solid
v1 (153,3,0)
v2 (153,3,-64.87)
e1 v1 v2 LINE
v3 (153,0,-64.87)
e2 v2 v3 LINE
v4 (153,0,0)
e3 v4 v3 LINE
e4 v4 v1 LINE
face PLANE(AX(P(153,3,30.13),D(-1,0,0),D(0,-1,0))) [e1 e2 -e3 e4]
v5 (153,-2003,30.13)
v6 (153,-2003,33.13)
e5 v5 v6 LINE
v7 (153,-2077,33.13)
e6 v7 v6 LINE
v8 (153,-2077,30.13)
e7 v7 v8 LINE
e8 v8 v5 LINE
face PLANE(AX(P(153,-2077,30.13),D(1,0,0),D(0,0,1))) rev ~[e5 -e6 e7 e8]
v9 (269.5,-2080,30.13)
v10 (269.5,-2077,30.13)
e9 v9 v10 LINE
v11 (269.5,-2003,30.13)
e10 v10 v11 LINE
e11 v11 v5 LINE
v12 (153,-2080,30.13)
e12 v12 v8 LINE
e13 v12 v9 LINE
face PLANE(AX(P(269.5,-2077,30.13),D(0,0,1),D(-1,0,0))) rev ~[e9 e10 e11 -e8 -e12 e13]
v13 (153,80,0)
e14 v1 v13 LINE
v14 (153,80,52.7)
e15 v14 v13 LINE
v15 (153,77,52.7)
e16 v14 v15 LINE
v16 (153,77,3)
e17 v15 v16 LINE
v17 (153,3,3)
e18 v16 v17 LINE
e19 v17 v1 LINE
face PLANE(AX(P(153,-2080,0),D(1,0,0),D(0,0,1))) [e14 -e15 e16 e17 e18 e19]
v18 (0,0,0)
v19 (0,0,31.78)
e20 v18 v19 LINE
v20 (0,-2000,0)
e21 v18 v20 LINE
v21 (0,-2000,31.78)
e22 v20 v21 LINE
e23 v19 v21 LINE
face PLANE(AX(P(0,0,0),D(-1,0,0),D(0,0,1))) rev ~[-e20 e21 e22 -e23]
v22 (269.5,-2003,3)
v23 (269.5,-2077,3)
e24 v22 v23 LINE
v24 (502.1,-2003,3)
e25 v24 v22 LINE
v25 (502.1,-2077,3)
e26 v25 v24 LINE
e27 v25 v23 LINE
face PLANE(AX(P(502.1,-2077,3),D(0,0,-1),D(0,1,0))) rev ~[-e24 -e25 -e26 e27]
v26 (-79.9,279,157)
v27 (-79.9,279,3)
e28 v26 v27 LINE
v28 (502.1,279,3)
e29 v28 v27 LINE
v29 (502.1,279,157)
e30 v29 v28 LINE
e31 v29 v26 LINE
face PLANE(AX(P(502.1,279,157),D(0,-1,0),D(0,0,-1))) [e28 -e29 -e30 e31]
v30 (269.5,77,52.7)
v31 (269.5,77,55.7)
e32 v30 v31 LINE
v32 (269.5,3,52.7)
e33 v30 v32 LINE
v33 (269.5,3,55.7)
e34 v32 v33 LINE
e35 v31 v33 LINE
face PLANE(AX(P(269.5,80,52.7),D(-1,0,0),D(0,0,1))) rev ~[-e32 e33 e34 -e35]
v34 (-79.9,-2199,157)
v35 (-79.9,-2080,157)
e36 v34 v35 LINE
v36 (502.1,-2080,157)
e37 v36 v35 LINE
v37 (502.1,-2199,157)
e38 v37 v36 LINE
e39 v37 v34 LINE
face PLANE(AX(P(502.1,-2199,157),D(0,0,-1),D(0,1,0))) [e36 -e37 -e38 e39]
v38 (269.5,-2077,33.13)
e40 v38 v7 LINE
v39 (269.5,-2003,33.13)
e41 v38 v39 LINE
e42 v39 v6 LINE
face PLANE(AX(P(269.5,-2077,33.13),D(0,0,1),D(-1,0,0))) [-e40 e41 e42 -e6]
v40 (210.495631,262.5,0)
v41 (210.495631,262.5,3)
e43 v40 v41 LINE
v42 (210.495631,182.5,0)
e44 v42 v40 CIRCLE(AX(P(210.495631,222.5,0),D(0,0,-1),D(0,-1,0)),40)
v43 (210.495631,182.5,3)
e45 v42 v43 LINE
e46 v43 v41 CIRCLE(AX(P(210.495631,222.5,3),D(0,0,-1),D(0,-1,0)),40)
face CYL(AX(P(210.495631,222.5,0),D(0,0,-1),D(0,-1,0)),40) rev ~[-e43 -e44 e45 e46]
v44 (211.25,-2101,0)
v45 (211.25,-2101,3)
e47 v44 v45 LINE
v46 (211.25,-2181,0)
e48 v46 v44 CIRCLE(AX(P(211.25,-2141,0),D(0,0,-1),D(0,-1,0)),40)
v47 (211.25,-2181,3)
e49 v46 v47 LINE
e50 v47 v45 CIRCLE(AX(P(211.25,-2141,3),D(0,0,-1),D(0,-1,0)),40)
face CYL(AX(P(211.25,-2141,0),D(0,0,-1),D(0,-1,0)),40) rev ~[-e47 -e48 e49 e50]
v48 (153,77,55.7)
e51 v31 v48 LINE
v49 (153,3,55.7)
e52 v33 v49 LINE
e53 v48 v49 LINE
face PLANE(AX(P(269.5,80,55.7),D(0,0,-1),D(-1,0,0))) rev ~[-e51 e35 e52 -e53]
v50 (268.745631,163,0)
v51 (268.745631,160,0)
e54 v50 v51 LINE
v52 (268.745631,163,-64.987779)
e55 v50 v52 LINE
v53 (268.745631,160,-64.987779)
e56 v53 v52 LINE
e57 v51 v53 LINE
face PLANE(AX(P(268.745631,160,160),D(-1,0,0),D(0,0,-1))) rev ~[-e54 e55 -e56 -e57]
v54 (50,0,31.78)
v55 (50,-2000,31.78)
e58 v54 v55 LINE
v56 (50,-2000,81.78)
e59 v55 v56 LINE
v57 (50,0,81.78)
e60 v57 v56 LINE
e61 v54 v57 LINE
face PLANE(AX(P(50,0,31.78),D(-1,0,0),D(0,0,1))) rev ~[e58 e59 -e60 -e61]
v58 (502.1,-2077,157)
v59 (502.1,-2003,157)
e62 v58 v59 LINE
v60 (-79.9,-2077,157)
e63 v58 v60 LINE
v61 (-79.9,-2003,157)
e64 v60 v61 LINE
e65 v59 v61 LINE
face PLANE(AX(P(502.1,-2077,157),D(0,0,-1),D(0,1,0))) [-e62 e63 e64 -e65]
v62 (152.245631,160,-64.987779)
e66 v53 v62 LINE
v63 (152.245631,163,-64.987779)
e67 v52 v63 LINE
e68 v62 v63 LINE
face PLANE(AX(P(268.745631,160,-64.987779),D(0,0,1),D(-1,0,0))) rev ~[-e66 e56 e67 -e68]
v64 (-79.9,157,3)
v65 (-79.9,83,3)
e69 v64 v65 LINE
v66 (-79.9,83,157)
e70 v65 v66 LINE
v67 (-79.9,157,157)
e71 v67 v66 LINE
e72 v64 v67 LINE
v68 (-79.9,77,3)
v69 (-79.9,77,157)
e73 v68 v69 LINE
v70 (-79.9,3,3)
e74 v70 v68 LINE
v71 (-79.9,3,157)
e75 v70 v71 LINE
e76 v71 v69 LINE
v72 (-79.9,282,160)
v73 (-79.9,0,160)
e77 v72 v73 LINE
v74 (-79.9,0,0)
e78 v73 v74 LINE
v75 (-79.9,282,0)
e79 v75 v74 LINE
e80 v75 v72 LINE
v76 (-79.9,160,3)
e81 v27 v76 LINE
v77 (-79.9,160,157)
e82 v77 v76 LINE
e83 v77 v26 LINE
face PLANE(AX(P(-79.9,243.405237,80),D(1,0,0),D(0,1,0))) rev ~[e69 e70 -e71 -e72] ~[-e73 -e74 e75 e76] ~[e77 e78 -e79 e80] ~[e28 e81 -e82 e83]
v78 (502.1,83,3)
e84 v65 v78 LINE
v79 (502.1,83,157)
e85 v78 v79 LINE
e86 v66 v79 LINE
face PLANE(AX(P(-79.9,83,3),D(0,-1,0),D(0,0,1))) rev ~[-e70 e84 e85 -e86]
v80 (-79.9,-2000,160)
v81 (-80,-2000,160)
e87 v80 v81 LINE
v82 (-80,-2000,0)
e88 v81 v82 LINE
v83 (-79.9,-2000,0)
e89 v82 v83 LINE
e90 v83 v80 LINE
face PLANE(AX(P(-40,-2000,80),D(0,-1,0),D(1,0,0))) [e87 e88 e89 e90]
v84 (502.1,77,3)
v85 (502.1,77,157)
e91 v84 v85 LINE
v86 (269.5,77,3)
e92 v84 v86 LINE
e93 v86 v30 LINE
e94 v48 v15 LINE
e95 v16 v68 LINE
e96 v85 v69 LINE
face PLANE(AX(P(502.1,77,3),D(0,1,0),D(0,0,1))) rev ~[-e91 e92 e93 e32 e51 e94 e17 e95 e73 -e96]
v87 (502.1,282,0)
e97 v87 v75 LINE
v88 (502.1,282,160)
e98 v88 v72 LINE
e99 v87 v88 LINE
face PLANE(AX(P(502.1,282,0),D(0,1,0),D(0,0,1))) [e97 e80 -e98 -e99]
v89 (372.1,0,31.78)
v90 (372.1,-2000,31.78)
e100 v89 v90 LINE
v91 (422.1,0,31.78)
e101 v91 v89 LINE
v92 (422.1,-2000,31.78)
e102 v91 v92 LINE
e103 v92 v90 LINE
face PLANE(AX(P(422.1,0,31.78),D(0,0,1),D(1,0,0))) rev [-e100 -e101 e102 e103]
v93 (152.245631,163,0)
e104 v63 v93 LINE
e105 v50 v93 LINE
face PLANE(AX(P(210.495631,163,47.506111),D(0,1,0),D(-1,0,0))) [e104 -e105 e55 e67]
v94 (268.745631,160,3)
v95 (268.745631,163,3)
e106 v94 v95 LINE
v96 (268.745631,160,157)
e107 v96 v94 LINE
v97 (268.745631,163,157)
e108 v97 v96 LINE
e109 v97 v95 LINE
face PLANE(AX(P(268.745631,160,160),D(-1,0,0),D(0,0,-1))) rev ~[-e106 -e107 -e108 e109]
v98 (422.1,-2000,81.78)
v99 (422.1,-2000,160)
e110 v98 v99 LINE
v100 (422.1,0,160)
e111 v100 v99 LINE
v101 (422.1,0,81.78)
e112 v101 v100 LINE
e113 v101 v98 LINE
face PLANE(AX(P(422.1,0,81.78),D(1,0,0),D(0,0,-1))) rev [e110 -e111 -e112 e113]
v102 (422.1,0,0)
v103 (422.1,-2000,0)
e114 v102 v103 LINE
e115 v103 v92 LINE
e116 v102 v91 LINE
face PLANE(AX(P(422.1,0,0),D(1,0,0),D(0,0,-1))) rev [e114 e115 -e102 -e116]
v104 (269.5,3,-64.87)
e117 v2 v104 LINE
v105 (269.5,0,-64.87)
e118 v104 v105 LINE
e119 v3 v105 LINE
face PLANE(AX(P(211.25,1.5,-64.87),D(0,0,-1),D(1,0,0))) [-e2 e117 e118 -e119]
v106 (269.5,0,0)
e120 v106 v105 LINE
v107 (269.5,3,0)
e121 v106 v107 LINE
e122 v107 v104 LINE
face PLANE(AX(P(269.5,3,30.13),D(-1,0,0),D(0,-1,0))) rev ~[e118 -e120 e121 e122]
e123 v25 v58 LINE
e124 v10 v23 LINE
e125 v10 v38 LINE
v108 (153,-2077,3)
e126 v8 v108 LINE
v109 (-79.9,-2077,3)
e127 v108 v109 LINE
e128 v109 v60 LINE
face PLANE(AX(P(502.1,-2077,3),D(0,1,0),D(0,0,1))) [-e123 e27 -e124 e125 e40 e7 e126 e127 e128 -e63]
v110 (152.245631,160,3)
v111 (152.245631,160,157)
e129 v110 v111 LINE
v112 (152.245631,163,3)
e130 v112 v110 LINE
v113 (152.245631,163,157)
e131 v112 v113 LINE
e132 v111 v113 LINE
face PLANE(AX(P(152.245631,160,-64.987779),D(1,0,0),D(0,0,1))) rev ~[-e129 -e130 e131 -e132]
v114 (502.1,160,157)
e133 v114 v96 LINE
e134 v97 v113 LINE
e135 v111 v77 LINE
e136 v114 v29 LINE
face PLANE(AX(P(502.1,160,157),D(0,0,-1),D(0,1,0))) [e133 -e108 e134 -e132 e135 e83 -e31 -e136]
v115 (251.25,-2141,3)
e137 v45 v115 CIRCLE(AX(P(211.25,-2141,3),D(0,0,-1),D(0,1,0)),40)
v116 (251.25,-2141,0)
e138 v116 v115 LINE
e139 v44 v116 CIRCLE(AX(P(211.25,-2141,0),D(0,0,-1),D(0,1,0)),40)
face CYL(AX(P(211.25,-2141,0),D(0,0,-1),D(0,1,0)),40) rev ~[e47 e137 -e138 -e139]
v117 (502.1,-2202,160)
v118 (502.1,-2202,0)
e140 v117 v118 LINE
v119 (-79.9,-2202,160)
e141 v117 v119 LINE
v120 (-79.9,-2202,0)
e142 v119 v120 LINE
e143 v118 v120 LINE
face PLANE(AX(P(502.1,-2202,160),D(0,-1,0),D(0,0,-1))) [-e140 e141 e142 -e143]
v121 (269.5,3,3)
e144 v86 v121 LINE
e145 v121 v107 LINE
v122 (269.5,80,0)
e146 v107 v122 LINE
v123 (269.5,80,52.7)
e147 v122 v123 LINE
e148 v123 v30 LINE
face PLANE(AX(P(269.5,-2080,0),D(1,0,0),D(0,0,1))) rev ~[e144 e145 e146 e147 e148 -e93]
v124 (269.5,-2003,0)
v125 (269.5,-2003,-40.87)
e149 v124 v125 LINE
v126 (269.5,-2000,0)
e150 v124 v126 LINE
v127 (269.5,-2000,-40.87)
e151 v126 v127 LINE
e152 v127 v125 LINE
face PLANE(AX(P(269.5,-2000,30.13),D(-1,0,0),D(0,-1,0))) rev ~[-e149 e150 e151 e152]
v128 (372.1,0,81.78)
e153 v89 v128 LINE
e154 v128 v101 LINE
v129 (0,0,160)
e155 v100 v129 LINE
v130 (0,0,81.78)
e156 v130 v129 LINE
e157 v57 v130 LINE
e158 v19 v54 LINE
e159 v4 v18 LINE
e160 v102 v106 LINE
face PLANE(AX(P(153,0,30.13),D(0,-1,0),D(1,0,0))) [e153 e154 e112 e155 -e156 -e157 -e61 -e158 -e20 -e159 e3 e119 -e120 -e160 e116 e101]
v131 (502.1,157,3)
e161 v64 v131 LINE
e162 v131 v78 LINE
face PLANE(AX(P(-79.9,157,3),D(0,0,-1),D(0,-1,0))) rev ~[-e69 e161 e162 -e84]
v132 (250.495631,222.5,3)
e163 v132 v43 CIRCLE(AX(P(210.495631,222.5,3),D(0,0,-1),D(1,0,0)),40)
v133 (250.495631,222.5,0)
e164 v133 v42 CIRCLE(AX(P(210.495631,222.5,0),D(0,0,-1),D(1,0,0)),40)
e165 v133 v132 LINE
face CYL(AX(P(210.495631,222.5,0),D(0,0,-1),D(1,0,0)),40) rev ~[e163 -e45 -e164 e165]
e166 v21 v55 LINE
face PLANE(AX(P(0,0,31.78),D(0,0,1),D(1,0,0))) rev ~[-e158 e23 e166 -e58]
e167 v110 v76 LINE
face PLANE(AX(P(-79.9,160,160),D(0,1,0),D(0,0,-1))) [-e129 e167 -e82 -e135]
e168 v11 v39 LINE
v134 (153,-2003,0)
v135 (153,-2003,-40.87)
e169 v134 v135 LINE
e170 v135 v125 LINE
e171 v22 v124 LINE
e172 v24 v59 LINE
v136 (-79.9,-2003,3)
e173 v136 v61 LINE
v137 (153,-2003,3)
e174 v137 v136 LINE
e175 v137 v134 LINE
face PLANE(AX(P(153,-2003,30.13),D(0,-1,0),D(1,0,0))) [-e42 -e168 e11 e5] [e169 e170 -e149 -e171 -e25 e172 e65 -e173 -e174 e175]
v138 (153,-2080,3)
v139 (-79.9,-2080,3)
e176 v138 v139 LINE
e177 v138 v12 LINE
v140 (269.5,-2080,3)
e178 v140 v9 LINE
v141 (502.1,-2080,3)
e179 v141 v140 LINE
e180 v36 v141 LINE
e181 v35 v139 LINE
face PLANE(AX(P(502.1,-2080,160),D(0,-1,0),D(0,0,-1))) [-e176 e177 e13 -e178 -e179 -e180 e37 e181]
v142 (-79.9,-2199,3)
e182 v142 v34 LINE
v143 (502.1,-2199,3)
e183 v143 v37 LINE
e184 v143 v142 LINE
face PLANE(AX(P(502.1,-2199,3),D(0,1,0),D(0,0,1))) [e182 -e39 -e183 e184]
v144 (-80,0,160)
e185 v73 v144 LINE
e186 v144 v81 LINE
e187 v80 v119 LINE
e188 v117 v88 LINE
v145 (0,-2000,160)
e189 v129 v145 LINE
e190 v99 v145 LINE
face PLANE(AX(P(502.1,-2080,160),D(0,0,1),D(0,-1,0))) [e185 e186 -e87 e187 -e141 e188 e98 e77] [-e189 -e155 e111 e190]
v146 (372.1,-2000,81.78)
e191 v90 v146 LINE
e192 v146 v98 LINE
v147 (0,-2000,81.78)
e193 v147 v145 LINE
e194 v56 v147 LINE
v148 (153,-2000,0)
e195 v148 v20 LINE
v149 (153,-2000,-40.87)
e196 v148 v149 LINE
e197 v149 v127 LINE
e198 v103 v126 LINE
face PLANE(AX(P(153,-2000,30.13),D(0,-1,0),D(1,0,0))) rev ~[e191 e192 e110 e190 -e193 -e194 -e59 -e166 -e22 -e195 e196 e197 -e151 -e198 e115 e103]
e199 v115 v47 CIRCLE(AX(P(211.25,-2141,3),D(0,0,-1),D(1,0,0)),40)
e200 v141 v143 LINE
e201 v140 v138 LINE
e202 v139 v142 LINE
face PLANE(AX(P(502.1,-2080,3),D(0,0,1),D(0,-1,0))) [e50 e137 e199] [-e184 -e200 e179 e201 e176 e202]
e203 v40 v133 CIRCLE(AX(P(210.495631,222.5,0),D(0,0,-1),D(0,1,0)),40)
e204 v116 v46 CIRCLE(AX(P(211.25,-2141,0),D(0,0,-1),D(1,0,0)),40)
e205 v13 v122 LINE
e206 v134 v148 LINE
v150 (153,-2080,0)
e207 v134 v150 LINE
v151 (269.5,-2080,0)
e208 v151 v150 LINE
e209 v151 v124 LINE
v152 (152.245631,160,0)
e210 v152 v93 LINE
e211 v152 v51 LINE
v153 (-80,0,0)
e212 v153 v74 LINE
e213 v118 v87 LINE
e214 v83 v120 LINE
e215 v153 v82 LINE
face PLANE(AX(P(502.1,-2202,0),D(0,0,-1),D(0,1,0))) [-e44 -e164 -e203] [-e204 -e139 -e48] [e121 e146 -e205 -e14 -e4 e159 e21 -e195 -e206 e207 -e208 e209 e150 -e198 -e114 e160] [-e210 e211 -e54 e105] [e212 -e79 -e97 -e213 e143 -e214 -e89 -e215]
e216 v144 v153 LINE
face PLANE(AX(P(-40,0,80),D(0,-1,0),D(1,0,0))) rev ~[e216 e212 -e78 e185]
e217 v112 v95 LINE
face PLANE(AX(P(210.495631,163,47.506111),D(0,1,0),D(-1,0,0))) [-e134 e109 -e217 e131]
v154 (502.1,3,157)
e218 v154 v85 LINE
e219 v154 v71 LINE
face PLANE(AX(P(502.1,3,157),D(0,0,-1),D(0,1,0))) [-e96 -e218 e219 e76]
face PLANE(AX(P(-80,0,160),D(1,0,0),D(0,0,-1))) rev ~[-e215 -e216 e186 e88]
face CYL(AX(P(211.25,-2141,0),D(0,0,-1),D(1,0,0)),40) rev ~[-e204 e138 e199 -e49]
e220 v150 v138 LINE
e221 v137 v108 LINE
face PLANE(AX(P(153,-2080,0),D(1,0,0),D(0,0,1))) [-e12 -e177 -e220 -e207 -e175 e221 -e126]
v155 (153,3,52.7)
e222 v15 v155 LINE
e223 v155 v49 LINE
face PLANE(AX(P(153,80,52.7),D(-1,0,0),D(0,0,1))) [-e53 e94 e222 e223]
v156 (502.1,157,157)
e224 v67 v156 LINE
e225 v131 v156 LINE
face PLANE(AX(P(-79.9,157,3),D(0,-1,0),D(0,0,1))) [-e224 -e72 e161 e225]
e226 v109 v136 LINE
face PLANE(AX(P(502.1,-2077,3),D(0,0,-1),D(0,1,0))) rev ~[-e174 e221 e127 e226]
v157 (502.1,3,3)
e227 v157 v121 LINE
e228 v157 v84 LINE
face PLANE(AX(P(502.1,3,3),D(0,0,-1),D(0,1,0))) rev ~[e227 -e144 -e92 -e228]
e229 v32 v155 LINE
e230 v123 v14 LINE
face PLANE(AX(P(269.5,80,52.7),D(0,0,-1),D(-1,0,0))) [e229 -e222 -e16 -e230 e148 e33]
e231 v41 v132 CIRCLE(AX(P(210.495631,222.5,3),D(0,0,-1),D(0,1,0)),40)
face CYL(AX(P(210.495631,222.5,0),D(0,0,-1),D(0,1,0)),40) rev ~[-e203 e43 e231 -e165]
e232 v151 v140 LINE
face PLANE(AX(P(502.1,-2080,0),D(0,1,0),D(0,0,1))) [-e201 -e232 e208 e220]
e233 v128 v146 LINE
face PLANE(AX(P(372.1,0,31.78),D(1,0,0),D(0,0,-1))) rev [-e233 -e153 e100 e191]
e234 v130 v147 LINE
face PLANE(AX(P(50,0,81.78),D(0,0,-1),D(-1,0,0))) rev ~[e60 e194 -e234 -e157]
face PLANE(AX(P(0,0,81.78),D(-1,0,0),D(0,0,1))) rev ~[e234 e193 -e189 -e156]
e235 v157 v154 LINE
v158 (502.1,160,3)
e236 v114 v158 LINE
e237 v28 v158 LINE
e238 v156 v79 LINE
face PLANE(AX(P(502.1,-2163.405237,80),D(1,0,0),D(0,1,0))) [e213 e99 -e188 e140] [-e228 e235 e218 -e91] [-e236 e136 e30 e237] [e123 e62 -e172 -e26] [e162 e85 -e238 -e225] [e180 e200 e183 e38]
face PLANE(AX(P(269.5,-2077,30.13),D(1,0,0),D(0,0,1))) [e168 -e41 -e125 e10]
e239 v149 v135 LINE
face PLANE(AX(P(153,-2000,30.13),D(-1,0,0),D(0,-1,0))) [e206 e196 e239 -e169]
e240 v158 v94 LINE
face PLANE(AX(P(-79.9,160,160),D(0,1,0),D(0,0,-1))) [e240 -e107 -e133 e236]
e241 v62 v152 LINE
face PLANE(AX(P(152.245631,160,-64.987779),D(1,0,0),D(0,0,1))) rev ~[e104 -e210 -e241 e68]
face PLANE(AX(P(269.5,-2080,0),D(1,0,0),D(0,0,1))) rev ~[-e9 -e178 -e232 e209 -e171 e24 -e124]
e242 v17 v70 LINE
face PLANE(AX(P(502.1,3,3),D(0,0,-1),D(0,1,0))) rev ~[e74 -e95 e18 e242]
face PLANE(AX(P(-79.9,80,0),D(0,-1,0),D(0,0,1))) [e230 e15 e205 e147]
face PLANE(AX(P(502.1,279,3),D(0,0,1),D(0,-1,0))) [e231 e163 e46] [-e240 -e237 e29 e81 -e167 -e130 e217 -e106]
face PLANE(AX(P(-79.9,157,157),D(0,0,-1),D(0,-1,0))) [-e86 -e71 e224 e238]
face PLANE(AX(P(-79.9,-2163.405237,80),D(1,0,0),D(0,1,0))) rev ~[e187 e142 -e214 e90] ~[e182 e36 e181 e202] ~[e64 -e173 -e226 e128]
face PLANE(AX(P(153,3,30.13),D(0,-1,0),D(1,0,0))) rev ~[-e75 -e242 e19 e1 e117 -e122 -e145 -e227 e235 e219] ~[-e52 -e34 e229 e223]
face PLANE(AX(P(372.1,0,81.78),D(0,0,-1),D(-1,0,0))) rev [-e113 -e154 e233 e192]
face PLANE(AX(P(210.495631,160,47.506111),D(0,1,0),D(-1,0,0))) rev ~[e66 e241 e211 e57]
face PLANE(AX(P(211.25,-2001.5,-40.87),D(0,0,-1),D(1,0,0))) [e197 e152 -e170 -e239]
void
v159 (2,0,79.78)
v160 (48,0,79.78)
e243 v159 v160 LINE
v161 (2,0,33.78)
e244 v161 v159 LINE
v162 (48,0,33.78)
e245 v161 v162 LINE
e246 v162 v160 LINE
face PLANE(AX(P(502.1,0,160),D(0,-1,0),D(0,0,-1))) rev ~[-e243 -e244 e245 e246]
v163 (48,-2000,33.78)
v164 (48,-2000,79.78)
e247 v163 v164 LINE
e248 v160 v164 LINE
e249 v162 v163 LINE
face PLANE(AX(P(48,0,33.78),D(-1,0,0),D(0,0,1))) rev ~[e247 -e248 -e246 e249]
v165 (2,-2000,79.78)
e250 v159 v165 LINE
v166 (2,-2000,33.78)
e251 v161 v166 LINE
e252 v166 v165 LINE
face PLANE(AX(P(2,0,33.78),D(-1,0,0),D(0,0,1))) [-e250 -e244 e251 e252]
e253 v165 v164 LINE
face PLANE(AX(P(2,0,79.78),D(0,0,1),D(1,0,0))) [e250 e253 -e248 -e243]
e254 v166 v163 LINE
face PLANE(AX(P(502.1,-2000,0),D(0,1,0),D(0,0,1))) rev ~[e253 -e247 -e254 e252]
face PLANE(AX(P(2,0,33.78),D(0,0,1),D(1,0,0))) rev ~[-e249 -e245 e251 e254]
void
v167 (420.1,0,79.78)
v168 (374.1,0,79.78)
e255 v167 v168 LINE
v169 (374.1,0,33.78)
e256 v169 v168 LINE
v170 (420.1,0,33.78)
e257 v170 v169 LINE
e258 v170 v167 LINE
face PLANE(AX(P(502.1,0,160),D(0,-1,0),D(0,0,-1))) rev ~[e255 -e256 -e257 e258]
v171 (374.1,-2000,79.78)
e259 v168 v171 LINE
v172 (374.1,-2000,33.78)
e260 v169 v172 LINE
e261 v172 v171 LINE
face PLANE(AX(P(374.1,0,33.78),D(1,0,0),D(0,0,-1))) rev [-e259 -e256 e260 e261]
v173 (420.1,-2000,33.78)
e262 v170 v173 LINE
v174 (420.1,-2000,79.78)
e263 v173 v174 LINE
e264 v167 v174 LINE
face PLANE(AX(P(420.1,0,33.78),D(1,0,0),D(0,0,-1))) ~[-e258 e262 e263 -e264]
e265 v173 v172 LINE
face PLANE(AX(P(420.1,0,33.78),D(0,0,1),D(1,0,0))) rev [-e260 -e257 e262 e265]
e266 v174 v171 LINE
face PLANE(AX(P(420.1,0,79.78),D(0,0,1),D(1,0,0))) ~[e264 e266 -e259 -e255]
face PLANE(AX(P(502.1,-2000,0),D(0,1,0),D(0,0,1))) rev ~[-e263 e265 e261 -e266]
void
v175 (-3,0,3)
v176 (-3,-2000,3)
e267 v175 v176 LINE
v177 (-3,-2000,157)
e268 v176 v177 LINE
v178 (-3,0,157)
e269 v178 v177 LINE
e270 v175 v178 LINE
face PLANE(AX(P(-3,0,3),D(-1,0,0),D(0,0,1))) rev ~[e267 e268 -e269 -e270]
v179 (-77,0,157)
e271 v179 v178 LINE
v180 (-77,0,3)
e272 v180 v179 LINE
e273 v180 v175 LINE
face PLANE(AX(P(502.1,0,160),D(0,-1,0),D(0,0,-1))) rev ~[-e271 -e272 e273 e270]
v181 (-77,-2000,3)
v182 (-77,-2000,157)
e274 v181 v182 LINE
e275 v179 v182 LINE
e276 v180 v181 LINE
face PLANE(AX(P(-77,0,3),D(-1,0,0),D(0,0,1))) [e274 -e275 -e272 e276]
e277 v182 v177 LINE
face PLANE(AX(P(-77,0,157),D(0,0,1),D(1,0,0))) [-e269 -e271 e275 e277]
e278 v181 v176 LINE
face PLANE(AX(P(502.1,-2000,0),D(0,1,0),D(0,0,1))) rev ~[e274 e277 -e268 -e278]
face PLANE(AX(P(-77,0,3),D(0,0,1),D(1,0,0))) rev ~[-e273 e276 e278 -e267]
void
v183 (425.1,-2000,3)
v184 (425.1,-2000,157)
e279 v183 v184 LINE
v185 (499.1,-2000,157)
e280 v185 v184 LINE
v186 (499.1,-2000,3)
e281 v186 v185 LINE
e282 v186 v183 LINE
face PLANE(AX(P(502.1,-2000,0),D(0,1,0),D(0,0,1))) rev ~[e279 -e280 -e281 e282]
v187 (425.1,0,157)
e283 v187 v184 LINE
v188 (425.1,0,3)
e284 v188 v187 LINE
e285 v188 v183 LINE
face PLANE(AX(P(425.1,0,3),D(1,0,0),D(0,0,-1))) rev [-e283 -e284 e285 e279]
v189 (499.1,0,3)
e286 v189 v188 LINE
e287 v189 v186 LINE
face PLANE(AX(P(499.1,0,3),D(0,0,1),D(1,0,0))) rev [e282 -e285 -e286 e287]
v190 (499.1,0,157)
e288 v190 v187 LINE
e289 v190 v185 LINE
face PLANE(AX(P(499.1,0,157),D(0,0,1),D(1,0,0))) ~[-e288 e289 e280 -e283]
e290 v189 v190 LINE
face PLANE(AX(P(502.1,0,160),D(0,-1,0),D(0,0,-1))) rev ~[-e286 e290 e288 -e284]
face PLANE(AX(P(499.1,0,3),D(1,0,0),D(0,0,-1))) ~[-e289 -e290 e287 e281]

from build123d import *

# Parameters (mm, degrees)
F0_W      = 74
F0_H      = 154
F0_W_2    = 46
F0_H_2    = 46
F1_DEPTH  = 2000
F6_W      = 74
F6_H      = 154
F7_DEPTH  = 582
F8_W      = 74
F8_H      = 154
F9_DEPTH  = 582
F10_W     = 58.25
F10_H     = 30.13
F11_DEPTH = 2160.001
F12_W     = 116.5
F12_H     = 3
F13_DEPTH = 74
F14_W     = 116.5
F14_H     = 3
F15_DEPTH = 76
F16_W     = 116.5
F16_H     = 3
F17_DEPTH = 71
F18_W     = 116.5
F18_H     = 3
F19_DEPTH = 95
F20_W     = 116.5
F20_H     = 3
F20_H_2   = 22.57
F21_DEPTH = 77
F22_DEPTH = 77
F23_DEPTH = 77
F24_W     = 74
F24_H     = 154
F25_DEPTH = 582
F27_DEPTH = 3
F29_DEPTH = 582
F31_DEPTH = 25
F32_DEPTH = 582
F34_DEPTH = 25


# Not quite as in the source:
# - a feature names something its author has since deleted; it is built from what else it names


with BuildPart() as f1:
    # F0 (on Front) → F1 (new body)
    with BuildSketch(Plane.XZ):
        Polygon((-80, 0), (0, 0), (0, 16.85), (0, 31.78), (0, 81.78), (0, 160), (-77, 160), (-80, 160), align=None)
        with Locations((-40, 80)):
            Rectangle(F0_W, F0_H, mode=Mode.SUBTRACT)
        Polygon((0, 81.78), (0, 31.78), (50, 31.78), (50, 81.78), (2, 81.78), align=None)
        with Locations((25, 56.78)):
            Rectangle(F0_W_2, F0_H_2, mode=Mode.SUBTRACT)
    extrude(amount=F1_DEPTH)


with BuildPart() as f2_1:
    # F2: instance of F1
    add(f1.part.mirror(Plane(origin=(50, -1000, 56.78), x_dir=(0, 1, 0), z_dir=(1, 0, 0))))


with BuildPart() as f2_1_1:
    # F3: moved
    add(f2_1.part.moved(Location((63, 0, 0))))


with BuildPart() as f2_1_2:
    # F5: moved
    add(f2_1_1.part.moved(Location((259.1, 0, 0))))


with BuildPart() as f1_1:
    add(f1.part)

    add(f2_1_2.part)  # F7 merges F2_1
    # F6 (on face) → F7 (join)
    with BuildSketch(Plane.YZ.offset(502.1)):
        Polygon((-2000, 0), (-2000, 160), (-2077, 160), (-2080, 160), (-2080, 0), align=None)
        with Locations((-2040, 80)):
            Rectangle(F6_W, F6_H, mode=Mode.SUBTRACT)
    extrude(amount=-F7_DEPTH)

    # F8 (on face) → F9 (join)
    with BuildSketch(Plane.YZ.offset(502.1)):
        Polygon((80, 160), (0, 160), (0, 0), (3, 0), (80, 0), align=None)
        with Locations((40, 80)):
            Rectangle(F8_W, F8_H, mode=Mode.SUBTRACT)
    extrude(amount=-F9_DEPTH)

    # F10 (on face) → F11 (cut, through all)
    with BuildSketch(Plane.XZ.offset(2080)):
        with Locations((182.125, 15.065)):
            Rectangle(F10_W, F10_H)
        with Locations((240.375, 15.065)):
            Rectangle(F10_W, F10_H)
    extrude(amount=-F11_DEPTH, mode=Mode.SUBTRACT)

    # F12 (on face) + F10 (on face) → F13 (join)
    with BuildSketch(Plane(origin=(0, -2077, 0), x_dir=(-1, 0, 0), z_dir=(0, 1, 0))):
        with Locations((-211.25, 31.63)):
            Rectangle(F12_W, F12_H)
    with BuildSketch(Plane.XZ.offset(2080)):
        with Locations((182.125, 15.065)):
            Rectangle(F10_W, F10_H)
    extrude(amount=F13_DEPTH, dir=(0, 1, 0))

    # F14 (on face) → F15 (join)
    with BuildSketch(Plane.XZ.offset(-77)):
        with Locations((211.25, 31.63)):
            Rectangle(F14_W, F14_H)
    extrude(amount=F15_DEPTH)

    # F16 (on face) → F17 (join)
    with BuildSketch(Plane(origin=(0, 0, 30.13), x_dir=(1, 0, 0), z_dir=(0, 0, -1))):
        with Locations((211.25, 2001.5)):
            Rectangle(F16_W, F16_H)
    extrude(amount=F17_DEPTH)

    # F18 (on face) → F19 (join)
    with BuildSketch(Plane(origin=(0, 0, 30.13), x_dir=(1, 0, 0), z_dir=(0, 0, -1))):
        with Locations((211.25, -1.5)):
            Rectangle(F18_W, F18_H)
    extrude(amount=F19_DEPTH)

    # F20 (on face) → F21 (cut)
    with BuildSketch(Plane(origin=(0, 80, 0), x_dir=(-1, 0, 0), z_dir=(0, 1, 0))):
        with Locations((-211.25, 54.2)):
            Rectangle(F20_W, F20_H)
        with Locations((-211.25, 41.415)):
            Rectangle(F20_W, F20_H_2)
    extrude(amount=-F21_DEPTH, mode=Mode.SUBTRACT)

    # F20 (on face) → F22 (join)
    with BuildSketch(Plane(origin=(0, 80, 0), x_dir=(-1, 0, 0), z_dir=(0, 1, 0))):
        with Locations((-211.25, 54.2)):
            Rectangle(F20_W, F20_H)
    extrude(amount=-F22_DEPTH)

    # F10 (on face) → F23 (cut)
    with BuildSketch(Plane.XZ.offset(2080)):
        with Locations((182.125, 15.065)):
            Rectangle(F10_W, F10_H)
    extrude(amount=-F23_DEPTH, mode=Mode.SUBTRACT)

    # F24 (on face) → F25 (join)
    with BuildSketch(Plane(origin=(-79.9, 0, 0), x_dir=(0, -1, 0), z_dir=(-1, 0, 0))):
        Polygon((-80, 3), (-80, 160), (-160, 160), (-160, 0), (-80, 0), align=None)
        with Locations((-120, 80)):
            Rectangle(F24_W, F24_H, mode=Mode.SUBTRACT)
    extrude(amount=-F25_DEPTH)

    # F26 (on face) → F27 (join)
    with BuildSketch(Plane(origin=(0, 160, 0), x_dir=(-1, 0, 0), z_dir=(0, 1, 0))):
        Polygon((-268.7456309795, 160), (-268.7456309795, 0), (-268.7456309795, -64.9877786636), (-152.2456309795, -64.9877786636), (-152.2456309795, 160), align=None)
    extrude(amount=F27_DEPTH)

    # F28 (on face) → F29 (join)
    with BuildSketch(Plane.YZ.offset(502.1)):
        Polygon((282, 160), (160, 160), (160, 157), (279, 157), (279, 3), (160, 3), (160, 0), (282, 0), align=None)
    extrude(amount=-F29_DEPTH)

    # F30 (on face) → F31 (cut)
    with BuildSketch(Plane(origin=(0, 0, 0), x_dir=(1, 0, 0), z_dir=(0, 0, -1))):
        with BuildLine():
            ThreePointArc((250.4956309795, -222.5), (238.779902227, -194.2157287525), (210.4956309795, -182.5))
            Line((210.4956309795, -182.5), (210.4956309795, -222.5))
            Line((210.4956309795, -222.5), (210.4956309795, -262.5))
            ThreePointArc((210.4956309795, -262.5), (238.779902227, -250.7842712475), (250.4956309795, -222.5))
        make_face()
        with BuildLine():
            Line((210.4956309795, -222.5), (210.4956309795, -182.5))
            ThreePointArc((210.4956309795, -182.5), (170.4956309795, -222.5), (210.4956309795, -262.5))
            Line((210.4956309795, -262.5), (210.4956309795, -222.5))
        make_face()
    extrude(amount=-F31_DEPTH, mode=Mode.SUBTRACT)

    # F28 (on face) → F32 (join)
    with BuildSketch(Plane.YZ.offset(502.1)):
        Polygon((-2080, 157), (-2080, 160), (-2202, 160), (-2202, 0), (-2080, 0), (-2080, 3), (-2199, 3), (-2199, 157), align=None)
    extrude(amount=-F32_DEPTH)

    # F33 (on face) → F34 (cut)
    with BuildSketch(Plane(origin=(0, 0, 0), x_dir=(1, 0, 0), z_dir=(0, 0, -1))):
        with BuildLine():
            ThreePointArc((211.25, 2181), (171.25, 2141), (211.25, 2101))
            Line((211.25, 2101), (211.25, 2181))
        make_face()
        with BuildLine():
            Line((211.25, 2181), (211.25, 2101))
            ThreePointArc((211.25, 2101), (239.5342712475, 2112.7157287525), (251.25, 2141))
            ThreePointArc((251.25, 2141), (239.5342712475, 2169.2842712475), (211.25, 2181))
        make_face()
    extrude(amount=-F34_DEPTH, mode=Mode.SUBTRACT)


solid = f1_1.part
